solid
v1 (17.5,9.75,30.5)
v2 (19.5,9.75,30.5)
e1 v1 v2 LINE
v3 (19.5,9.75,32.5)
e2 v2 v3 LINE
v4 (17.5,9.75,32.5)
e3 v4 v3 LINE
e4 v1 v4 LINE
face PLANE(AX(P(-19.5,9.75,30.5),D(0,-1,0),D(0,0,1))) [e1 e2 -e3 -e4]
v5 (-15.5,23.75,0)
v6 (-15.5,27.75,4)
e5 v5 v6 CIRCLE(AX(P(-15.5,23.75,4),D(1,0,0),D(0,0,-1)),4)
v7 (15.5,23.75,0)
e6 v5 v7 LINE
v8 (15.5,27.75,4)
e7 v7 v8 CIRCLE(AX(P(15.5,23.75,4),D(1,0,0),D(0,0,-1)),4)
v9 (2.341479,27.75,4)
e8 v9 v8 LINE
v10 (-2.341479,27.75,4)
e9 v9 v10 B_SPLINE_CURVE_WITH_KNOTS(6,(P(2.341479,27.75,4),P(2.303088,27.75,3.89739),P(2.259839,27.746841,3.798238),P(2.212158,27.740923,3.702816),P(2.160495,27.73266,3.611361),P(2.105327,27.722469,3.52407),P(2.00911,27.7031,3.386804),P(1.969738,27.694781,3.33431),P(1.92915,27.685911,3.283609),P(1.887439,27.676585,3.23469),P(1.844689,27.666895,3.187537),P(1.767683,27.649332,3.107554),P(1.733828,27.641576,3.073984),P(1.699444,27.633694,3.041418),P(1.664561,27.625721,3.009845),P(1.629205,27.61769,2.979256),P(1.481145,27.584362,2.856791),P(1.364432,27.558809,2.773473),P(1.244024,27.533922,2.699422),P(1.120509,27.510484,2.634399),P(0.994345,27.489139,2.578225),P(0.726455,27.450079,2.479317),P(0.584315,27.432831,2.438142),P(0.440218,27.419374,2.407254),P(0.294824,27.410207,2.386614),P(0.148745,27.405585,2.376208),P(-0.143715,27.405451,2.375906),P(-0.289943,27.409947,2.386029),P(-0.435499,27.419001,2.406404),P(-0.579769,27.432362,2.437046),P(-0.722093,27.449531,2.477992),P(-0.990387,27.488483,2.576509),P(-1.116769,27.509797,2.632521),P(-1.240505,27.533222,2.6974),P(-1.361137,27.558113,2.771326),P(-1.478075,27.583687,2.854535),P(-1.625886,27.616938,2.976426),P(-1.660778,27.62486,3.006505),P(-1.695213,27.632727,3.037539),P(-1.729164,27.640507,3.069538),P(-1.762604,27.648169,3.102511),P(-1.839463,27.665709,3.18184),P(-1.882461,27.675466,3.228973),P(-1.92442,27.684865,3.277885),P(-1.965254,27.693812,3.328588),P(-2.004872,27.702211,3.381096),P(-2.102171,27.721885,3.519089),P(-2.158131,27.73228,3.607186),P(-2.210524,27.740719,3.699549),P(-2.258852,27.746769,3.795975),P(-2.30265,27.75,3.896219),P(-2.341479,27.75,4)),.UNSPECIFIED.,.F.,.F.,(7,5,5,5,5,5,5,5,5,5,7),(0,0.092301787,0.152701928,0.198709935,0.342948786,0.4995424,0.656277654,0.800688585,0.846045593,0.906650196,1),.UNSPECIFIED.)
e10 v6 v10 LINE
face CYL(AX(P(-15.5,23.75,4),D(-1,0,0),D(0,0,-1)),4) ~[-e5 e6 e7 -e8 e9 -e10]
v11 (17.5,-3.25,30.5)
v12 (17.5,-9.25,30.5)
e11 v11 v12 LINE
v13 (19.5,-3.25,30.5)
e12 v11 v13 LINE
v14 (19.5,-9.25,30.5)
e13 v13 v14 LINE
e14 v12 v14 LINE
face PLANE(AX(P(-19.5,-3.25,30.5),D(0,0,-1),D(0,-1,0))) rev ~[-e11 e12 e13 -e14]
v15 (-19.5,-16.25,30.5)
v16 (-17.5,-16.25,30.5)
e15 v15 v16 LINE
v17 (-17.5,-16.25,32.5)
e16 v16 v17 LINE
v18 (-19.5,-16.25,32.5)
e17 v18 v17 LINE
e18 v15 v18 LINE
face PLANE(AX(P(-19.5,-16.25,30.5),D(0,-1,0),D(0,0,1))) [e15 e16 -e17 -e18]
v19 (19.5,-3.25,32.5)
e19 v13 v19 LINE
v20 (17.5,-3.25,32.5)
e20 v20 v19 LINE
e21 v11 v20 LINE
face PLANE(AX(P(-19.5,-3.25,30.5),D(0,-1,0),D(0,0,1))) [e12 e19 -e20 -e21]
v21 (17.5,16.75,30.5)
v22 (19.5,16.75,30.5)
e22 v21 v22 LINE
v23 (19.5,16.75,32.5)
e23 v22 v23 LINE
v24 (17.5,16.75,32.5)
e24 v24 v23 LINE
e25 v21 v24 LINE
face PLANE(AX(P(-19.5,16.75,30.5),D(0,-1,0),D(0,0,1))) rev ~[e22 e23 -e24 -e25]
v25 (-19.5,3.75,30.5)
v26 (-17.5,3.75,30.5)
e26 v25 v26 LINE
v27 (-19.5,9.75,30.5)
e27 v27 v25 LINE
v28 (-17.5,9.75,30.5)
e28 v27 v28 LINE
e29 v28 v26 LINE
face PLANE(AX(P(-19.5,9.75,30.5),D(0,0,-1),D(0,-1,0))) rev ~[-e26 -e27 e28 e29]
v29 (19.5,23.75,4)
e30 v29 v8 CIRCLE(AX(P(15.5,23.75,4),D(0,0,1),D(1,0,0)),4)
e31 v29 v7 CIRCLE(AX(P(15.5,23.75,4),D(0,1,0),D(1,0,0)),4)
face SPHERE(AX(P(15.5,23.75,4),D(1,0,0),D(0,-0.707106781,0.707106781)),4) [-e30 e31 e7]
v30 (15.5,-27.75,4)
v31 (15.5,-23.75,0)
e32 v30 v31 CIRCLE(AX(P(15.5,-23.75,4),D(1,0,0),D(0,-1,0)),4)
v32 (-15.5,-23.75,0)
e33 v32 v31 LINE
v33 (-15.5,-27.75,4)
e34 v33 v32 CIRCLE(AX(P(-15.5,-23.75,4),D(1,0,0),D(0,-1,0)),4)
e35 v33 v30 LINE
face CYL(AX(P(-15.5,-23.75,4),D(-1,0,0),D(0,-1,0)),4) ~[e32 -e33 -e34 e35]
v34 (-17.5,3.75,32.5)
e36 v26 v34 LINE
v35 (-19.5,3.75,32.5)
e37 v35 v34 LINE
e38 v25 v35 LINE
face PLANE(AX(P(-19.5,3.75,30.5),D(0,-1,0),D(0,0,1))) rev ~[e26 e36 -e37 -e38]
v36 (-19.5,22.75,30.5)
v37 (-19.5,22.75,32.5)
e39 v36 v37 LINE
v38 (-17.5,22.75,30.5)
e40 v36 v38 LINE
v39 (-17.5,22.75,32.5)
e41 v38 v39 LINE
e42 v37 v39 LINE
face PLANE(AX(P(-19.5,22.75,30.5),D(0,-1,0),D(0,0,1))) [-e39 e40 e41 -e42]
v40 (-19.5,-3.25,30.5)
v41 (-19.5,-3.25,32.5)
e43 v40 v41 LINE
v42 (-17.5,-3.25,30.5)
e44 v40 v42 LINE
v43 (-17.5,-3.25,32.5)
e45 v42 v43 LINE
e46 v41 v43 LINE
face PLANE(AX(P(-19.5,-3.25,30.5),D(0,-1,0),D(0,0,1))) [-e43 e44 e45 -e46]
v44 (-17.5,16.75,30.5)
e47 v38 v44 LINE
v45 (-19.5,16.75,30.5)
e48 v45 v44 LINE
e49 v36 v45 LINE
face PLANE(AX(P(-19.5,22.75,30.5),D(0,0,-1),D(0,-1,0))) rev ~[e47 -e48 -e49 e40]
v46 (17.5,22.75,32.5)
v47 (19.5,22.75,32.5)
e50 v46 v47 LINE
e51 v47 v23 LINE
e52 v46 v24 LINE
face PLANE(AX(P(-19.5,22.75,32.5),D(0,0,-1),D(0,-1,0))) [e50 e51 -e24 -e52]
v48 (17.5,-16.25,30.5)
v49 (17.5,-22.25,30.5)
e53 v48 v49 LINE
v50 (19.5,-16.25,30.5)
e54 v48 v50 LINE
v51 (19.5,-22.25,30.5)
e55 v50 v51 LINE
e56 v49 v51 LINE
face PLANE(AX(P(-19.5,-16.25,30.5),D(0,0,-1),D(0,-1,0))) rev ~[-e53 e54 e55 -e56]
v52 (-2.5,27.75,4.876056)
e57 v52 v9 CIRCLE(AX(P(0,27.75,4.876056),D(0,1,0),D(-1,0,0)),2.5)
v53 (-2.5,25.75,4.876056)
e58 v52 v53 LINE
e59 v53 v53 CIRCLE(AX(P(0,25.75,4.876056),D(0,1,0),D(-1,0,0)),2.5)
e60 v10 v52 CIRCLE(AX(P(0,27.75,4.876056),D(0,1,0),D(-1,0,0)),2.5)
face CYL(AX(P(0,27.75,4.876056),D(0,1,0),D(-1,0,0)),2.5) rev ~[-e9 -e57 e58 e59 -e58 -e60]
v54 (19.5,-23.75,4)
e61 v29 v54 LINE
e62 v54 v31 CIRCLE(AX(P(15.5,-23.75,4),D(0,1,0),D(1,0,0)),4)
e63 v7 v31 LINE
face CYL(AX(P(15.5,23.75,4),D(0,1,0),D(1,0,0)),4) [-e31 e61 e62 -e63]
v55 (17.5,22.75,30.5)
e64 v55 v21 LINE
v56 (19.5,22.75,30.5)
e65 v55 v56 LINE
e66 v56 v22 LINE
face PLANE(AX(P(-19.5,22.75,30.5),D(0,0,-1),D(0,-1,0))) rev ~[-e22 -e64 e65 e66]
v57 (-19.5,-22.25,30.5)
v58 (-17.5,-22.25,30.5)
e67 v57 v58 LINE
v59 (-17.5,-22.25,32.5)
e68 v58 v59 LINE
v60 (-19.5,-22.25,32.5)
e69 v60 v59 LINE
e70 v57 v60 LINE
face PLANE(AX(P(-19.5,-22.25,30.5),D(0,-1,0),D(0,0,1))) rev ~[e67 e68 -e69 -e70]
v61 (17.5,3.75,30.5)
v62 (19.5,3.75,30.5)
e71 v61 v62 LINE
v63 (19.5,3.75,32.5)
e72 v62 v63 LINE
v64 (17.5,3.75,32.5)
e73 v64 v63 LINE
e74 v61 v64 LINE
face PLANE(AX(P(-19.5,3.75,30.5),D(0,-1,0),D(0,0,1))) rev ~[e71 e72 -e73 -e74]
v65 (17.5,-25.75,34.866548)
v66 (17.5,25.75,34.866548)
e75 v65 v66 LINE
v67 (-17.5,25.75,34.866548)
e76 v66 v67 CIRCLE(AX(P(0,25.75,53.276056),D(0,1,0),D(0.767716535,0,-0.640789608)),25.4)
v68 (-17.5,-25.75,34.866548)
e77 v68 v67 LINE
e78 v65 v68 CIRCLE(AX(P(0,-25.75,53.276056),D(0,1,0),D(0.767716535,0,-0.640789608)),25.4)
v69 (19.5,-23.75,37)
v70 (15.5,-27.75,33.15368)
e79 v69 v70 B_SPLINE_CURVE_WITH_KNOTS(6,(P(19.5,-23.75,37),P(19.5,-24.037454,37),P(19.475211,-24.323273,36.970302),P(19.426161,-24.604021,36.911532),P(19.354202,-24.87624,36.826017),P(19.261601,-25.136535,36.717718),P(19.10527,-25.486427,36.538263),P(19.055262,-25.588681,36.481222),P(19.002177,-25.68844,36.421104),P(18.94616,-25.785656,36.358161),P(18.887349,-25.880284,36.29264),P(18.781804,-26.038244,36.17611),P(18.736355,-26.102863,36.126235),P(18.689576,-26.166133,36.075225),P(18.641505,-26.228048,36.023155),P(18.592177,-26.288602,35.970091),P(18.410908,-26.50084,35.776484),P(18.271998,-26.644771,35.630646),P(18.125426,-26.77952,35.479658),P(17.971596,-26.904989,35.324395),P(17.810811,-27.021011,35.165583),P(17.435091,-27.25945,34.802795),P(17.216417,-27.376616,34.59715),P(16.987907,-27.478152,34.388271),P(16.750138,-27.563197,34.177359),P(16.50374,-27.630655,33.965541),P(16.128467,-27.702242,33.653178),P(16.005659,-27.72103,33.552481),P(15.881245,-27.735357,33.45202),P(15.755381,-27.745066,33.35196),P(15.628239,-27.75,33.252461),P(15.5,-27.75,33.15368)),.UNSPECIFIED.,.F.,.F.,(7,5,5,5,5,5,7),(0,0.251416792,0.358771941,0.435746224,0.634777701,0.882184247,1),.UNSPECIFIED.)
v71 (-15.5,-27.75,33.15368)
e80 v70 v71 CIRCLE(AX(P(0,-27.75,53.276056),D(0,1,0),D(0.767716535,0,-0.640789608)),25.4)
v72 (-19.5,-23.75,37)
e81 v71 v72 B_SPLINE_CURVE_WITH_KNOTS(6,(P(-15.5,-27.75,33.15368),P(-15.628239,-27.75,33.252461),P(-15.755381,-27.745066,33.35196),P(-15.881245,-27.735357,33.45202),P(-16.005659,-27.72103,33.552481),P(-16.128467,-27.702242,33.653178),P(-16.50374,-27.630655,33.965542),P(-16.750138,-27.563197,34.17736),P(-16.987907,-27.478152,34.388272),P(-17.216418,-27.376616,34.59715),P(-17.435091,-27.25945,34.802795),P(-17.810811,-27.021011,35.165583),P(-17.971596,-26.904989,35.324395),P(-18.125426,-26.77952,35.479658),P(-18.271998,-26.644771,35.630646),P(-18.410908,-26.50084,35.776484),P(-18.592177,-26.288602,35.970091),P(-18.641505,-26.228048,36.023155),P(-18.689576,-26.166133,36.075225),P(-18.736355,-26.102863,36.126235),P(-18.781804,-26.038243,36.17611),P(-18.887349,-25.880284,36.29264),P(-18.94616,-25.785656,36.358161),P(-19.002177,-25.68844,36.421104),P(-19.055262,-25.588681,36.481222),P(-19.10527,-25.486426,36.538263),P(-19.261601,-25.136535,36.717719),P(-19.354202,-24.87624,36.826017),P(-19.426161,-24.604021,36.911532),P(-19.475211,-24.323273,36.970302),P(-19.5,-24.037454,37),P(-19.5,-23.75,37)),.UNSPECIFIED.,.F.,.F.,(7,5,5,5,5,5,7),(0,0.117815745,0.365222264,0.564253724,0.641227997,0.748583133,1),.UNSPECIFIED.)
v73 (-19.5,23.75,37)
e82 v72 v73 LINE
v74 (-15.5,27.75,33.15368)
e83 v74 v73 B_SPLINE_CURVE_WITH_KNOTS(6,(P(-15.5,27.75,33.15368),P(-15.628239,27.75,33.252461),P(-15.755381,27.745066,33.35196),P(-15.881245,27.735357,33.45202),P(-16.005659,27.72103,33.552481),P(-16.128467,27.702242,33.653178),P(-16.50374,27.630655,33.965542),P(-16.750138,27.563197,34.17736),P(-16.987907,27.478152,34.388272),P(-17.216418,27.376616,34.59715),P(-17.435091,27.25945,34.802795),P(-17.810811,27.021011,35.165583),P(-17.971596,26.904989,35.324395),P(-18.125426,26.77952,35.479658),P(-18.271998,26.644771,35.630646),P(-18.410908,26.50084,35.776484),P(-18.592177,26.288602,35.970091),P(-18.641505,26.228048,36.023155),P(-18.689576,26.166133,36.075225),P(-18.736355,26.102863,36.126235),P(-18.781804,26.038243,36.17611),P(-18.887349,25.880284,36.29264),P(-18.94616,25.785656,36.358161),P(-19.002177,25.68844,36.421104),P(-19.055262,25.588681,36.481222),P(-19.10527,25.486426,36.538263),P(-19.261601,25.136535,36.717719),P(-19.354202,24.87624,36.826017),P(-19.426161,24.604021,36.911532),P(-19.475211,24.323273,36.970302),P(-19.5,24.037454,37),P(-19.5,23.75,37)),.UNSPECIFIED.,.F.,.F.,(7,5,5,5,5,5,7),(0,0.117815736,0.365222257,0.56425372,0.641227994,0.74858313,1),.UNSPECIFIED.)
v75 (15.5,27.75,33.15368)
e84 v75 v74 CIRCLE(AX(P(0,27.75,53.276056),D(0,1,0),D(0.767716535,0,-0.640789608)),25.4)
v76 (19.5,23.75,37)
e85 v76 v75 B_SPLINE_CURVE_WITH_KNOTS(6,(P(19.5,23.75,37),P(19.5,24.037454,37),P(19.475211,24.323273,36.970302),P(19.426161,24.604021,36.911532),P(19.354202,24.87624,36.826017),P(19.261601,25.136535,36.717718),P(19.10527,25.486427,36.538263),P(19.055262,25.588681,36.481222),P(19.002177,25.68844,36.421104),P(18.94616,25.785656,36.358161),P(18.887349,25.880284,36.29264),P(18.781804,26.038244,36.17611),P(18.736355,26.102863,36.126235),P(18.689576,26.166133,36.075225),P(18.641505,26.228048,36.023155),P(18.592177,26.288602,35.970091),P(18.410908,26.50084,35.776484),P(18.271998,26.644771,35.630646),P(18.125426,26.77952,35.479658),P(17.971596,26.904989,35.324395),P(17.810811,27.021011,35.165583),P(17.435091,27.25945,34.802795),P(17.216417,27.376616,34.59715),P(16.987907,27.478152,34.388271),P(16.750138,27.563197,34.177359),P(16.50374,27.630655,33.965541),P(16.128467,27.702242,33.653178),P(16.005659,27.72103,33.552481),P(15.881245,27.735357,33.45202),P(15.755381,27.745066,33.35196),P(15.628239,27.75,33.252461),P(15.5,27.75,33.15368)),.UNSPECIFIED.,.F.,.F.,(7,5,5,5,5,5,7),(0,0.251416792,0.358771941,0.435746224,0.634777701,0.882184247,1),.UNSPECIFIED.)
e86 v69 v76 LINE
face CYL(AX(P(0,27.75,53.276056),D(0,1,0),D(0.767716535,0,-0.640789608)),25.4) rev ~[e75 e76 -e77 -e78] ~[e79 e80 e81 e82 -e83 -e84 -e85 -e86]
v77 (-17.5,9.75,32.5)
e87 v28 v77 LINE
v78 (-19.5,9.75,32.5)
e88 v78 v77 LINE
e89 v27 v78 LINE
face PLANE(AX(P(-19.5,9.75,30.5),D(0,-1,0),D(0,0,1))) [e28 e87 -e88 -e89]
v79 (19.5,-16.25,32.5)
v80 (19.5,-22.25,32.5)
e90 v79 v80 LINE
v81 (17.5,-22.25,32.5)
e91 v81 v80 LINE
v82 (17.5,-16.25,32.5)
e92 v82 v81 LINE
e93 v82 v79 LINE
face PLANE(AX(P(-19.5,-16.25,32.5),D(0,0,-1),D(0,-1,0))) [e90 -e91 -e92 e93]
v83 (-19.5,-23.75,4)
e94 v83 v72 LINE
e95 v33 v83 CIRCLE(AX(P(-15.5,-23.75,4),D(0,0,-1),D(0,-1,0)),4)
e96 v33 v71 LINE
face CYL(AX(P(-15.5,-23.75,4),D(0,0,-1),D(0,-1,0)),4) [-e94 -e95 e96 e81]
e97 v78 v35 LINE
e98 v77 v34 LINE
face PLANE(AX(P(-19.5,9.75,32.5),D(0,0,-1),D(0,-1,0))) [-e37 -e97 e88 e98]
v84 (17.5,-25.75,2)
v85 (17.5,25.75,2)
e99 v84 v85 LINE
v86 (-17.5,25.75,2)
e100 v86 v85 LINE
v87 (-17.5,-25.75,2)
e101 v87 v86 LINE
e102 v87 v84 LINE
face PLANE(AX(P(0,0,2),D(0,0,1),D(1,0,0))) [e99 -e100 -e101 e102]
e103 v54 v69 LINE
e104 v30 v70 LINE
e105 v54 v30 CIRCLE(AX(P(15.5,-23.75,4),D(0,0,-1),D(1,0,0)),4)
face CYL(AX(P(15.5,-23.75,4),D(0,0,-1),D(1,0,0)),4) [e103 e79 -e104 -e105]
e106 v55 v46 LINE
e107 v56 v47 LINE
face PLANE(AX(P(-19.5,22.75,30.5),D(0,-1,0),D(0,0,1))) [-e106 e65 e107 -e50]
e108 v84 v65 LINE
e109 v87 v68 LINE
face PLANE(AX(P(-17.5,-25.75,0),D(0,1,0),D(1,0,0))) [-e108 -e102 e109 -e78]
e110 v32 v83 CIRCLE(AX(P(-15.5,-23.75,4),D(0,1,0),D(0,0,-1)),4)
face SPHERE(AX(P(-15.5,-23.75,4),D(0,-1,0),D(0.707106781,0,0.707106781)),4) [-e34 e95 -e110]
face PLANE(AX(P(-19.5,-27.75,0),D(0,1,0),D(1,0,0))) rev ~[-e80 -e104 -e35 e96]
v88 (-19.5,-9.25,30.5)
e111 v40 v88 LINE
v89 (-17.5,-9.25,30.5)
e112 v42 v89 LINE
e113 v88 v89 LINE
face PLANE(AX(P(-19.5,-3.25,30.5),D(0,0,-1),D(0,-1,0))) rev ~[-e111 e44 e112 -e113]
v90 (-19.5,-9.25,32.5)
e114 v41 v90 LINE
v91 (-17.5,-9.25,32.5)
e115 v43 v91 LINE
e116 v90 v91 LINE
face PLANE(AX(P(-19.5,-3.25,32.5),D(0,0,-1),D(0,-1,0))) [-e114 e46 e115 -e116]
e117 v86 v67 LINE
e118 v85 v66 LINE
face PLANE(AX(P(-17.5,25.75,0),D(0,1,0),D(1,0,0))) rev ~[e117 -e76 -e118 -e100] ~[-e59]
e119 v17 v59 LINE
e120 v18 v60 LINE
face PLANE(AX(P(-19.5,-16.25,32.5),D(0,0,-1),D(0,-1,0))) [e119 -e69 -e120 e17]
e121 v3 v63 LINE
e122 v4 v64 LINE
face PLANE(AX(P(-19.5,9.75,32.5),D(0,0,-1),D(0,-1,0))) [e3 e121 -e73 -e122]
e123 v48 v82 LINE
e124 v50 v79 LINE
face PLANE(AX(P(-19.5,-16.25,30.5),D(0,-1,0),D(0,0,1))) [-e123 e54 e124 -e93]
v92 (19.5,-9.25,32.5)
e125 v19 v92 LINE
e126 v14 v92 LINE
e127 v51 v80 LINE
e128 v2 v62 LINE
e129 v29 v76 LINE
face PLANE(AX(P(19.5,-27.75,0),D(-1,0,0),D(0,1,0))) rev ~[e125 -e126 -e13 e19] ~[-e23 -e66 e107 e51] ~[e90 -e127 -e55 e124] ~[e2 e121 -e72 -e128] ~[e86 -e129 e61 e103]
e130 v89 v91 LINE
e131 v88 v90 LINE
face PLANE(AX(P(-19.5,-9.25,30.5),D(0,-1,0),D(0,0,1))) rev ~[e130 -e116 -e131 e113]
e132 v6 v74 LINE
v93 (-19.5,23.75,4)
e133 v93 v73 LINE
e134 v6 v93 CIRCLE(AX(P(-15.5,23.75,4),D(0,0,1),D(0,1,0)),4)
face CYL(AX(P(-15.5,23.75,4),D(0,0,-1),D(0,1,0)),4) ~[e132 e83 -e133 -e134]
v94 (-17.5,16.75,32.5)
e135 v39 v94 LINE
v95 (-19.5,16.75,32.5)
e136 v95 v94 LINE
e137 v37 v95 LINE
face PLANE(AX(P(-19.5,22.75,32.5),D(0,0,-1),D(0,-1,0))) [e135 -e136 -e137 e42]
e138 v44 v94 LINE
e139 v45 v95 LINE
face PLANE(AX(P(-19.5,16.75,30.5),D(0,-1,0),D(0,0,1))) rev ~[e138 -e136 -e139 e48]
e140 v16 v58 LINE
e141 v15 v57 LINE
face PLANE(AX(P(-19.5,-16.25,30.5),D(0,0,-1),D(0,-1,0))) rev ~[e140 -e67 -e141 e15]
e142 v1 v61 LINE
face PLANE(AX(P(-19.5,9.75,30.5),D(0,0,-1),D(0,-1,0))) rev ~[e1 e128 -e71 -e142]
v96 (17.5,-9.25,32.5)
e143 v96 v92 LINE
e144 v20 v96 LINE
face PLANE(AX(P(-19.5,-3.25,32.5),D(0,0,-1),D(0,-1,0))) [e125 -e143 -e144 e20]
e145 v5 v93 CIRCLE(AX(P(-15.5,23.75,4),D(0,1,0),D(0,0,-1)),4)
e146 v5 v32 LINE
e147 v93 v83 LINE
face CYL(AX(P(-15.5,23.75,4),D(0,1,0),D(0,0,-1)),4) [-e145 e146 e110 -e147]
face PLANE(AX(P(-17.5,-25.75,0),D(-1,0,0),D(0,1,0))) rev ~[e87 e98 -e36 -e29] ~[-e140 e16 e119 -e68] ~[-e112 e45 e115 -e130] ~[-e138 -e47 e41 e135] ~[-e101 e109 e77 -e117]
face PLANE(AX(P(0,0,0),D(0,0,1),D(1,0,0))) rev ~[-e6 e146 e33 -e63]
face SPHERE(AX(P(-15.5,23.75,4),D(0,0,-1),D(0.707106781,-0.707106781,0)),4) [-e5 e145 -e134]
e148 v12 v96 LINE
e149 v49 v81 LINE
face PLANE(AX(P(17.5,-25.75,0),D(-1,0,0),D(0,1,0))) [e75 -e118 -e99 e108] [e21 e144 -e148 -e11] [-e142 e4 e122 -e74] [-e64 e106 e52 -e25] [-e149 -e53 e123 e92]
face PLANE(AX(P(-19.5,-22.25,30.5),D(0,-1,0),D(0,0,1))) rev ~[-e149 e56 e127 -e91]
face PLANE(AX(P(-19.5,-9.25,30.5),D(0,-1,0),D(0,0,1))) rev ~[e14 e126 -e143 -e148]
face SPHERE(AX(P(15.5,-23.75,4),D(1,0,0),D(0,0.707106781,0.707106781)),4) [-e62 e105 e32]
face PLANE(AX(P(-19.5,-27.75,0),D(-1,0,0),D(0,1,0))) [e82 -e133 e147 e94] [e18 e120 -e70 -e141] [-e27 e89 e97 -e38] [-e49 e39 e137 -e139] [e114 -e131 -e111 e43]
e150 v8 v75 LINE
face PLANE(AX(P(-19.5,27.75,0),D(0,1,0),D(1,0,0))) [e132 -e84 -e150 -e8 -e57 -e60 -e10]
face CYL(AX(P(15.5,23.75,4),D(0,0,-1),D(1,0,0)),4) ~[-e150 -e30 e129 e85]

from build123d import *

# Parameters (mm, degrees)
F0_W         = 39
F0_H         = 55.5
F0_W_2       = 35
F0_H_2       = 51.5
F1_DEPTH     = 37
F3_DEPTH     = 56
F4_DEPTH     = 2
F5_R         = 2.5
F6_DEPTH     = 3
F7_W         = 6
F7_H         = 2
F8_DEPTH     = 40
F9_T1_DEPTH  = 47.5
F9_T3_DEPTH  = 31
F9_T5_DEPTH  = 43
F9_S9_W      = 4
F9_S9_H      = 4
F9_T10_DEPTH = 4
F9_S15_W     = 4
F9_S15_H     = 4
F9_T16_DEPTH = 4
F9_S21_W     = 4
F9_S21_H     = 4
F9_T22_DEPTH = 4
F9_S27_W     = 4
F9_S27_H     = 4
F9_T28_DEPTH = 4


# Not quite as in the source:
# - a fillet or chamfer that OpenCascade refuses, or shapes differently, is made with other operations: its cross-section is extruded or revolved along the edge and cut away or added


with BuildPart() as f1:
    # F0 (on Top) → F1 (new body)
    with BuildSketch(Plane.XY):
        Rectangle(F0_W, F0_H)
        Rectangle(F0_W_2, F0_H_2, mode=Mode.SUBTRACT)
    extrude(amount=F1_DEPTH)

    # F2 (on face) → F3 (cut)
    with BuildSketch(Plane(origin=(0, 27.75, 0), x_dir=(-1, 0, 0), z_dir=(0, 1, 0))):
        with BuildLine():
            Line((19.5, 37), (-19.5, 37))
            ThreePointArc((-19.5, 37), (0, 27.8760560333), (19.5, 37))
        make_face()
    extrude(amount=-F3_DEPTH, mode=Mode.SUBTRACT)

    # F0 (on Top) → F4 (join)
    with BuildSketch(Plane.XY):
        Rectangle(F0_W_2, F0_H_2)
    extrude(amount=F4_DEPTH)

    # F5 (on face) → F6 (cut)
    with BuildSketch(Plane(origin=(0, 27.75, 0), x_dir=(-1, 0, 0), z_dir=(0, 1, 0))):
        with Locations((0, 4.8760560333)):
            Circle(F5_R)
    extrude(amount=-F6_DEPTH, mode=Mode.SUBTRACT)

    # F7 (on face) → F8 (cut)
    with BuildSketch(Plane(origin=(-19.5, 0, 0), x_dir=(0, -1, 0), z_dir=(-1, 0, 0))):
        with Locations((-19.75, 31.5)):
            Rectangle(F7_W, F7_H)
        with Locations((-6.75, 31.5)):
            Rectangle(F7_W, F7_H)
        with Locations((6.25, 31.5)):
            Rectangle(F7_W, F7_H)
        with Locations((19.25, 31.5)):
            Rectangle(F7_W, F7_H)
    extrude(amount=-F8_DEPTH, mode=Mode.SUBTRACT)

    # F9: fillet of radius 4 on 8 edges, made by hand

    # F9_s2 → F9_t1 (cut)
    with BuildSketch(Plane.XZ.offset(-23.75)):
        with BuildLine():
            ThreePointArc((-15.5, 0), (-18.3284271247, 1.1715728753), (-19.5, 4))
            Line((-19.5, 4), (-19.5, 0))
            Line((-19.5, 0), (-15.5, 0))
        make_face()
        with BuildLine():
            ThreePointArc((19.5, 4), (18.3284271247, 1.1715728753), (15.5, 0))
            Line((15.5, 0), (19.5, 0))
            Line((19.5, 0), (19.5, 4))
        make_face()
    extrude(amount=F9_T1_DEPTH, mode=Mode.SUBTRACT)

    # F9_s4 → F9_t3 (cut)
    with BuildSketch(Plane.YZ.offset(-15.5)):
        with BuildLine():
            ThreePointArc((23.75, 0), (26.5784271247, 1.1715728753), (27.75, 4))
            Line((27.75, 4), (27.75, 0))
            Line((27.75, 0), (23.75, 0))
        make_face()
        with BuildLine():
            ThreePointArc((-27.75, 4), (-26.5784271247, 1.1715728753), (-23.75, 0))
            Line((-23.75, 0), (-27.75, 0))
            Line((-27.75, 0), (-27.75, 4))
        make_face()
    extrude(amount=F9_T3_DEPTH, mode=Mode.SUBTRACT)

    # F9_s6 → F9_t5 (cut)
    with BuildSketch(Plane.XY.offset(4)):
        with BuildLine():
            ThreePointArc((-15.5, -27.75), (-18.3284271247, -26.5784271247), (-19.5, -23.75))
            Line((-19.5, -23.75), (-19.5, -27.75))
            Line((-19.5, -27.75), (-15.5, -27.75))
        make_face()
        with BuildLine():
            ThreePointArc((19.5, -23.75), (18.3284271247, -26.5784271247), (15.5, -27.75))
            Line((15.5, -27.75), (19.5, -27.75))
            Line((19.5, -27.75), (19.5, -23.75))
        make_face()
        with BuildLine():
            ThreePointArc((19.5, 23.75), (18.3284271247, 26.5784271247), (15.5, 27.75))
            Line((15.5, 27.75), (19.5, 27.75))
            Line((19.5, 27.75), (19.5, 23.75))
        make_face()
        with BuildLine():
            ThreePointArc((-15.5, 27.75), (-18.3284271247, 26.5784271247), (-19.5, 23.75))
            Line((-19.5, 23.75), (-19.5, 27.75))
            Line((-19.5, 27.75), (-15.5, 27.75))
        make_face()
    extrude(amount=F9_T5_DEPTH, mode=Mode.SUBTRACT)


with BuildPart() as f9_tool8:
    # F9_s9 → F9_t10 (new body)
    with BuildSketch(Plane.XY.offset(4)):
        with Locations((-17.5, 25.75)):
            Rectangle(F9_S9_W, F9_S9_H)
    extrude(amount=-F9_T10_DEPTH)

    # F9_s11 → F9_t12 (revolve, cut)
    with BuildSketch(Plane(origin=(-15.5, 23.75, 4), x_dir=(0.7071067812, -0.7071067812, 0), z_dir=(0.7071067812, 0.7071067812, 0))):
        with BuildLine():
            ThreePointArc((0, -4), (4, 0), (0, 4))
            Line((0, 4), (0, -4))
        make_face()
    revolve(axis=Axis((-15.5, 23.75, 4), (0, 0, -1)), mode=Mode.SUBTRACT)


with BuildPart() as f1_1:
    add(f1.part)

    # F9_t7: cut F9_tool8
    add(f9_tool8.part, mode=Mode.SUBTRACT)


with BuildPart() as f9_tool14:
    # F9_s15 → F9_t16 (new body)
    with BuildSketch(Plane.XZ.offset(23.75)):
        with Locations((-17.5, 2)):
            Rectangle(F9_S15_W, F9_S15_H)
    extrude(amount=F9_T16_DEPTH)

    # F9_s17 → F9_t18 (revolve, cut)
    with BuildSketch(Plane(origin=(-15.5, -23.75, 4), x_dir=(0.7071067812, 0, 0.7071067812), z_dir=(0.7071067812, 0, -0.7071067812))):
        with BuildLine():
            ThreePointArc((0, -4), (4, 0), (0, 4))
            Line((0, 4), (0, -4))
        make_face()
    revolve(axis=Axis((-15.5, -23.75, 4), (0, -1, 0)), mode=Mode.SUBTRACT)


with BuildPart() as f1_2:
    add(f1_1.part)

    # F9_t13: cut F9_tool14
    add(f9_tool14.part, mode=Mode.SUBTRACT)


with BuildPart() as f9_tool20:
    # F9_s21 → F9_t22 (new body)
    with BuildSketch(Plane.YZ.offset(15.5)):
        with Locations((25.75, 2)):
            Rectangle(F9_S21_W, F9_S21_H)
    extrude(amount=F9_T22_DEPTH)

    # F9_s23 → F9_t24 (revolve, cut)
    with BuildSketch(Plane(origin=(15.5, 23.75, 4), x_dir=(0, -0.7071067812, 0.7071067812), z_dir=(0, 0.7071067812, 0.7071067812))):
        with BuildLine():
            ThreePointArc((0, -4), (4, 0), (0, 4))
            Line((0, 4), (0, -4))
        make_face()
    revolve(axis=Axis((15.5, 23.75, 4), (1, 0, 0)), mode=Mode.SUBTRACT)


with BuildPart() as f1_3:
    add(f1_2.part)

    # F9_t19: cut F9_tool20
    add(f9_tool20.part, mode=Mode.SUBTRACT)


with BuildPart() as f9_tool26:
    # F9_s27 → F9_t28 (new body)
    with BuildSketch(Plane.YZ.offset(15.5)):
        with Locations((-25.75, 2)):
            Rectangle(F9_S27_W, F9_S27_H)
    extrude(amount=F9_T28_DEPTH)

    # F9_s29 → F9_t30 (revolve, cut)
    with BuildSketch(Plane(origin=(15.5, -23.75, 4), x_dir=(0, 0.7071067812, 0.7071067812), z_dir=(0, 0.7071067812, -0.7071067812))):
        with BuildLine():
            ThreePointArc((0, -4), (4, 0), (0, 4))
            Line((0, 4), (0, -4))
        make_face()
    revolve(axis=Axis((15.5, -23.75, 4), (1, 0, 0)), mode=Mode.SUBTRACT)


with BuildPart() as f1_4:
    add(f1_3.part)

    # F9_t25: cut F9_tool26
    add(f9_tool26.part, mode=Mode.SUBTRACT)


solid = f1_4.part
